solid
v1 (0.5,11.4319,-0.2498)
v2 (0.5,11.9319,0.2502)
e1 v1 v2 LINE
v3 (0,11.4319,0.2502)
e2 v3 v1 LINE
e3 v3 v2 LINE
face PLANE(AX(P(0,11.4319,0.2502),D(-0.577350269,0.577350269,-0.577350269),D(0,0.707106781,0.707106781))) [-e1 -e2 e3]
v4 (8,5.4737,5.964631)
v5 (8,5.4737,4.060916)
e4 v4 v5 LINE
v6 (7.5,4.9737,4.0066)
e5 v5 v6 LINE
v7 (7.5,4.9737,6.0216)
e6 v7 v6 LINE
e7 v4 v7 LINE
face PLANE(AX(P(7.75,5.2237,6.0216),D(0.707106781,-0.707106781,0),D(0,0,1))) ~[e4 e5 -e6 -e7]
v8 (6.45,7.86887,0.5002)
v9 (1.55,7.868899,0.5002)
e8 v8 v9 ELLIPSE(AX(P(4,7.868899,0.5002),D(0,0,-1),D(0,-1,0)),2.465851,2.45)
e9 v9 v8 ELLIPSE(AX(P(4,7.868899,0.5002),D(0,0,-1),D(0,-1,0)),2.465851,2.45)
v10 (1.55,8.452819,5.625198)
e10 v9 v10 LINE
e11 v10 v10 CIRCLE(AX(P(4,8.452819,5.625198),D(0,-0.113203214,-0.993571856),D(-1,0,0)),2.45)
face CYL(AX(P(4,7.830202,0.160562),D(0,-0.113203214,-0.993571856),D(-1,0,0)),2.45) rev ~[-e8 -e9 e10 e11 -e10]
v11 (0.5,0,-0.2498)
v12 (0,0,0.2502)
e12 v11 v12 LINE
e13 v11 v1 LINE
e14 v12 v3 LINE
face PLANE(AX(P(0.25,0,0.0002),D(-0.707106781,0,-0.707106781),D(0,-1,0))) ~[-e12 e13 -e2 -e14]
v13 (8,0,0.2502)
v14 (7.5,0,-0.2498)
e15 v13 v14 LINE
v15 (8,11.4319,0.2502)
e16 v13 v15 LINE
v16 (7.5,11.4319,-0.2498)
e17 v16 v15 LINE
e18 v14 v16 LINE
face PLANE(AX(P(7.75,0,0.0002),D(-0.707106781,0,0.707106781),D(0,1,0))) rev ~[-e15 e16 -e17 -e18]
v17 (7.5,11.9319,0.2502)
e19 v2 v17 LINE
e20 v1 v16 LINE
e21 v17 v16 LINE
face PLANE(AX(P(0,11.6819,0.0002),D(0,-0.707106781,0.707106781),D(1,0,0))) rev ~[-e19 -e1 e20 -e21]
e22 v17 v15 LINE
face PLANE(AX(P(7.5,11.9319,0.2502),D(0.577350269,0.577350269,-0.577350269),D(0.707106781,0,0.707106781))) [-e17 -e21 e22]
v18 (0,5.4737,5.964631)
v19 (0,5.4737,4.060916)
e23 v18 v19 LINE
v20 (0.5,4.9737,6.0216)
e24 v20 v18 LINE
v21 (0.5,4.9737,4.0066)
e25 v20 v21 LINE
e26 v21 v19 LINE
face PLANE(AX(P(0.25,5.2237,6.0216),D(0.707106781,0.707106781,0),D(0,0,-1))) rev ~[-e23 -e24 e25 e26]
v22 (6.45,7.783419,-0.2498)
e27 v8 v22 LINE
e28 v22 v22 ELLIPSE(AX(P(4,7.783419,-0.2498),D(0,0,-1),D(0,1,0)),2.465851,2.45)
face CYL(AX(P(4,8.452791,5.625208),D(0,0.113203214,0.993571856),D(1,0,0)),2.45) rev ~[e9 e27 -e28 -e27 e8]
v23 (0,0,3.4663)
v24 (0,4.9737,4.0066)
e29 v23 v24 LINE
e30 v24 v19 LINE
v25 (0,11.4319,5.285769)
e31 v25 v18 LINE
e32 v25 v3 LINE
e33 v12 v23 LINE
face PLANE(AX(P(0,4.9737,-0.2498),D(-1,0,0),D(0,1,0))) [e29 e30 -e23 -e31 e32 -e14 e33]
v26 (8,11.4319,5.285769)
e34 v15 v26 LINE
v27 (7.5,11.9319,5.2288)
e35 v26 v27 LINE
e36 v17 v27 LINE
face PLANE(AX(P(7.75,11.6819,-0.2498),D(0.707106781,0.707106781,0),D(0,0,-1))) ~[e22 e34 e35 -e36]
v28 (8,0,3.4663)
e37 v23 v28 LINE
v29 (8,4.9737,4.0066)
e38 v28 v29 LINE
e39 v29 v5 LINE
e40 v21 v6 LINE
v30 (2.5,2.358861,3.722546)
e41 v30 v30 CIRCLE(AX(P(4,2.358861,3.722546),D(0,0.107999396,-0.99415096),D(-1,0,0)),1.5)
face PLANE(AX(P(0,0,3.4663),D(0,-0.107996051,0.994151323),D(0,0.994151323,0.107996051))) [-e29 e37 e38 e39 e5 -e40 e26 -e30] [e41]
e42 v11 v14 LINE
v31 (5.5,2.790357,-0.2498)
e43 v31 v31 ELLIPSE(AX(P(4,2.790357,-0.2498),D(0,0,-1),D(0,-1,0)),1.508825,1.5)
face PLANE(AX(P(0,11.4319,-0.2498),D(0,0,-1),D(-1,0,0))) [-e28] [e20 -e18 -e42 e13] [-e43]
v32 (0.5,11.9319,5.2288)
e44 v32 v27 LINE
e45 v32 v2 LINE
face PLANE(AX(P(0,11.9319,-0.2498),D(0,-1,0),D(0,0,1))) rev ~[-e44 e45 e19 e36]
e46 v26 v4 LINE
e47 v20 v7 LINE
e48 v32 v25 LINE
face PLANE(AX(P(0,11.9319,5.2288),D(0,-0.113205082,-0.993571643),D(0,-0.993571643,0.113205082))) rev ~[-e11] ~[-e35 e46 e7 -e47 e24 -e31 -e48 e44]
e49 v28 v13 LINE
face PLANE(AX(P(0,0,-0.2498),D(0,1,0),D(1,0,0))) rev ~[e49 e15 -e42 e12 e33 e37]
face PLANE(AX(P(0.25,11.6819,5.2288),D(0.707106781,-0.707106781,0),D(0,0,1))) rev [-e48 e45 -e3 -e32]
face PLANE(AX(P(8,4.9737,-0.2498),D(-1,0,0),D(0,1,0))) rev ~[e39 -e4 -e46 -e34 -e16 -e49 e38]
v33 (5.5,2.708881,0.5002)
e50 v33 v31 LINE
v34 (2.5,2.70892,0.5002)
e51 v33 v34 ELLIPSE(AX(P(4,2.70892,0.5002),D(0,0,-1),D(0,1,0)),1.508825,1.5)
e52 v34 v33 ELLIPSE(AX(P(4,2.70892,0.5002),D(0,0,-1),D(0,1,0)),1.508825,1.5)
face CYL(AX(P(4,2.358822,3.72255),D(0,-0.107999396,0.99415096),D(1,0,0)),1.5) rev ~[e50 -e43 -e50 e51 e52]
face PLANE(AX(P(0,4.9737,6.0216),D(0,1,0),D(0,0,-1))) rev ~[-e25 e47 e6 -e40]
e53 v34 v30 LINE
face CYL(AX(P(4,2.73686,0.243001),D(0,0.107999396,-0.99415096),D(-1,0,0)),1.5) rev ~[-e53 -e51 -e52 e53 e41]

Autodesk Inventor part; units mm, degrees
ref_plane "YZ Plane" through (0, 0, 0) normal (1, 0, 0) x (0, 1, 0)
ref_plane "XZ Plane" through (0, 0, 0) normal (0, 1, 0) x (-1, 0, 0)
ref_plane "XY Plane" through (0, 0, 0) normal (0, 0, 1) x (1, 0, 0)
sketch "Skizze5" plane through (0, 0, 0) normal (1, 0, 0) x (0, 1, 0)
  line L0 (0, 0) -> (0.5, 0)
  line L1 (0.5, 0) -> (4.9737, 0.486)
  line L2 (4.9737, 0.486) -> (11.4319, -0.2498)
  line L3 (11.4319, -0.2498) -> (11.9319, -0.2498)
  line L4 (11.9319, -0.2498) -> (11.9319, 5.2288)
  line L5 (11.9319, 5.2288) -> (4.9737, 6.0216)
  line L6 (0, 3.4663) -> (0, 0)
  line L7 (0, 3.4663) -> (4.9737, 4.0066)
  line L8 (4.9737, 8.0188) -> (4.9737, 2.9641) construction
  line L9 (4.9737, 6.0216) -> (4.9737, 4.0066)
  point P0 (0, 0)
  dimension "d21" = 0.5
  dimension "d22" = 6.2
  dimension "d23" = 6.5
  dimension "d24" = 4.5
  dimension "d25" = 6.5
  dimension "d26" = 5.5
  dimension "d27" = 3.5
extrude "Extrusion3" add sketch "Skizze5" along normal blind 8
sketch "Skizze6" plane through (8, 11.4319, -0.2498) normal (0, -0.1132032, -0.9935719) x (-1, 0, 0)
  circle A0 centre (4, -3.625) radius 2.45
  line L0 (4, 1.8046) -> (4, -8.9328)
  line L1 (-1.3459, -3.625) -> (9.5603, -3.625)
  line L2 (8, -0.1234) -> (8, -7.1266) projected
  line L3 (8, 0.4968) -> (0, 0.4968) projected
  point P0 (8, -11.3867)
  point P1 (8, -3.625)
  point P2 (4, 0.4968)
  dimension "d30" = 4.9
extrude "Extrusion4" cut sketch "Skizze6" against normal through all
sketch "Skizze7" plane through (8, 4.9737, 0.486) normal (0, 0.1079994, -0.994151) x (-1, 0, 0)
  line L0 (-0.1981, -2.25) -> (9.2596, -2.25)
  line L1 (4, -0.3434) -> (4, -7.0095)
  line L2 (8, -4.9971) -> (0, -4.9971) projected
  line L3 (8, -4.5) -> (8, 0) projected
  circle A0 centre (4, -2.25) radius 1.5
  point P0 (4, -4.9971)
  point P1 (8, -2.25)
  dimension "d33" = 3
extrude "Extrusion5" cut sketch "Skizze7" against normal through all
sketch "Skizze8" plane through (0, 11.4319, -0.2498) normal (0, 0, -1) x (-1, 0, 0)
  line L0 (-8, -6.4582) -> (-8, 0) projected
  line L1 (-8, -10.9319) -> (-8, -6.4582) projected
  line L2 (-8, -11.4319) -> (-8, -10.9319) projected
  line L3 (0, -11.4319) -> (-8, -11.4319) projected
  line L4 (0, -11.4319) -> (0, -10.9319) projected
  line L5 (0, -10.9319) -> (0, -6.4582) projected
  line L6 (0, -6.4582) -> (0, 0) projected
  line L7 (0, 0) -> (0, 0.5) projected
  line L8 (0, 0.5) -> (-8, 0.5) projected
  line L9 (-8, 0) -> (-8, 0.5) projected
extrude "Extrusion6" add sketch "Skizze8" against normal blind 0.75
sketch "Skizze9" plane through (0, 4.9737, 6.0216) normal (0, 0.1132032, 0.9935719) x (1, 0, 0)
  circle A0 centre (4, 3.5016) radius 2.45 projected
  point P0 (0, -4.26)
extrude "Extrusion7" cut sketch "Skizze9" against normal through all
sketch "Skizze10" plane through (0, 0, 3.4663) normal (0, -0.1079994, 0.994151) x (1, 0, 0)
  circle A0 centre (4, 2.3727) radius 1.5 projected
  point P0 (0, -0.3744)
extrude "Extrusion8" cut sketch "Skizze10" against normal through all
chamfer "Fase2" distance 0.5 angle 45 7 edges at (8, 5.9659, -0.2498) (4, 11.9319, -0.2498) (8, 11.9319, 2.4895) (0, 5.9659, -0.2498) (0, 11.9319, 2.4895) (8, 4.9737, 5.0141) (0, 4.9737, 5.0141)
properties part number "led_holder_v11"
